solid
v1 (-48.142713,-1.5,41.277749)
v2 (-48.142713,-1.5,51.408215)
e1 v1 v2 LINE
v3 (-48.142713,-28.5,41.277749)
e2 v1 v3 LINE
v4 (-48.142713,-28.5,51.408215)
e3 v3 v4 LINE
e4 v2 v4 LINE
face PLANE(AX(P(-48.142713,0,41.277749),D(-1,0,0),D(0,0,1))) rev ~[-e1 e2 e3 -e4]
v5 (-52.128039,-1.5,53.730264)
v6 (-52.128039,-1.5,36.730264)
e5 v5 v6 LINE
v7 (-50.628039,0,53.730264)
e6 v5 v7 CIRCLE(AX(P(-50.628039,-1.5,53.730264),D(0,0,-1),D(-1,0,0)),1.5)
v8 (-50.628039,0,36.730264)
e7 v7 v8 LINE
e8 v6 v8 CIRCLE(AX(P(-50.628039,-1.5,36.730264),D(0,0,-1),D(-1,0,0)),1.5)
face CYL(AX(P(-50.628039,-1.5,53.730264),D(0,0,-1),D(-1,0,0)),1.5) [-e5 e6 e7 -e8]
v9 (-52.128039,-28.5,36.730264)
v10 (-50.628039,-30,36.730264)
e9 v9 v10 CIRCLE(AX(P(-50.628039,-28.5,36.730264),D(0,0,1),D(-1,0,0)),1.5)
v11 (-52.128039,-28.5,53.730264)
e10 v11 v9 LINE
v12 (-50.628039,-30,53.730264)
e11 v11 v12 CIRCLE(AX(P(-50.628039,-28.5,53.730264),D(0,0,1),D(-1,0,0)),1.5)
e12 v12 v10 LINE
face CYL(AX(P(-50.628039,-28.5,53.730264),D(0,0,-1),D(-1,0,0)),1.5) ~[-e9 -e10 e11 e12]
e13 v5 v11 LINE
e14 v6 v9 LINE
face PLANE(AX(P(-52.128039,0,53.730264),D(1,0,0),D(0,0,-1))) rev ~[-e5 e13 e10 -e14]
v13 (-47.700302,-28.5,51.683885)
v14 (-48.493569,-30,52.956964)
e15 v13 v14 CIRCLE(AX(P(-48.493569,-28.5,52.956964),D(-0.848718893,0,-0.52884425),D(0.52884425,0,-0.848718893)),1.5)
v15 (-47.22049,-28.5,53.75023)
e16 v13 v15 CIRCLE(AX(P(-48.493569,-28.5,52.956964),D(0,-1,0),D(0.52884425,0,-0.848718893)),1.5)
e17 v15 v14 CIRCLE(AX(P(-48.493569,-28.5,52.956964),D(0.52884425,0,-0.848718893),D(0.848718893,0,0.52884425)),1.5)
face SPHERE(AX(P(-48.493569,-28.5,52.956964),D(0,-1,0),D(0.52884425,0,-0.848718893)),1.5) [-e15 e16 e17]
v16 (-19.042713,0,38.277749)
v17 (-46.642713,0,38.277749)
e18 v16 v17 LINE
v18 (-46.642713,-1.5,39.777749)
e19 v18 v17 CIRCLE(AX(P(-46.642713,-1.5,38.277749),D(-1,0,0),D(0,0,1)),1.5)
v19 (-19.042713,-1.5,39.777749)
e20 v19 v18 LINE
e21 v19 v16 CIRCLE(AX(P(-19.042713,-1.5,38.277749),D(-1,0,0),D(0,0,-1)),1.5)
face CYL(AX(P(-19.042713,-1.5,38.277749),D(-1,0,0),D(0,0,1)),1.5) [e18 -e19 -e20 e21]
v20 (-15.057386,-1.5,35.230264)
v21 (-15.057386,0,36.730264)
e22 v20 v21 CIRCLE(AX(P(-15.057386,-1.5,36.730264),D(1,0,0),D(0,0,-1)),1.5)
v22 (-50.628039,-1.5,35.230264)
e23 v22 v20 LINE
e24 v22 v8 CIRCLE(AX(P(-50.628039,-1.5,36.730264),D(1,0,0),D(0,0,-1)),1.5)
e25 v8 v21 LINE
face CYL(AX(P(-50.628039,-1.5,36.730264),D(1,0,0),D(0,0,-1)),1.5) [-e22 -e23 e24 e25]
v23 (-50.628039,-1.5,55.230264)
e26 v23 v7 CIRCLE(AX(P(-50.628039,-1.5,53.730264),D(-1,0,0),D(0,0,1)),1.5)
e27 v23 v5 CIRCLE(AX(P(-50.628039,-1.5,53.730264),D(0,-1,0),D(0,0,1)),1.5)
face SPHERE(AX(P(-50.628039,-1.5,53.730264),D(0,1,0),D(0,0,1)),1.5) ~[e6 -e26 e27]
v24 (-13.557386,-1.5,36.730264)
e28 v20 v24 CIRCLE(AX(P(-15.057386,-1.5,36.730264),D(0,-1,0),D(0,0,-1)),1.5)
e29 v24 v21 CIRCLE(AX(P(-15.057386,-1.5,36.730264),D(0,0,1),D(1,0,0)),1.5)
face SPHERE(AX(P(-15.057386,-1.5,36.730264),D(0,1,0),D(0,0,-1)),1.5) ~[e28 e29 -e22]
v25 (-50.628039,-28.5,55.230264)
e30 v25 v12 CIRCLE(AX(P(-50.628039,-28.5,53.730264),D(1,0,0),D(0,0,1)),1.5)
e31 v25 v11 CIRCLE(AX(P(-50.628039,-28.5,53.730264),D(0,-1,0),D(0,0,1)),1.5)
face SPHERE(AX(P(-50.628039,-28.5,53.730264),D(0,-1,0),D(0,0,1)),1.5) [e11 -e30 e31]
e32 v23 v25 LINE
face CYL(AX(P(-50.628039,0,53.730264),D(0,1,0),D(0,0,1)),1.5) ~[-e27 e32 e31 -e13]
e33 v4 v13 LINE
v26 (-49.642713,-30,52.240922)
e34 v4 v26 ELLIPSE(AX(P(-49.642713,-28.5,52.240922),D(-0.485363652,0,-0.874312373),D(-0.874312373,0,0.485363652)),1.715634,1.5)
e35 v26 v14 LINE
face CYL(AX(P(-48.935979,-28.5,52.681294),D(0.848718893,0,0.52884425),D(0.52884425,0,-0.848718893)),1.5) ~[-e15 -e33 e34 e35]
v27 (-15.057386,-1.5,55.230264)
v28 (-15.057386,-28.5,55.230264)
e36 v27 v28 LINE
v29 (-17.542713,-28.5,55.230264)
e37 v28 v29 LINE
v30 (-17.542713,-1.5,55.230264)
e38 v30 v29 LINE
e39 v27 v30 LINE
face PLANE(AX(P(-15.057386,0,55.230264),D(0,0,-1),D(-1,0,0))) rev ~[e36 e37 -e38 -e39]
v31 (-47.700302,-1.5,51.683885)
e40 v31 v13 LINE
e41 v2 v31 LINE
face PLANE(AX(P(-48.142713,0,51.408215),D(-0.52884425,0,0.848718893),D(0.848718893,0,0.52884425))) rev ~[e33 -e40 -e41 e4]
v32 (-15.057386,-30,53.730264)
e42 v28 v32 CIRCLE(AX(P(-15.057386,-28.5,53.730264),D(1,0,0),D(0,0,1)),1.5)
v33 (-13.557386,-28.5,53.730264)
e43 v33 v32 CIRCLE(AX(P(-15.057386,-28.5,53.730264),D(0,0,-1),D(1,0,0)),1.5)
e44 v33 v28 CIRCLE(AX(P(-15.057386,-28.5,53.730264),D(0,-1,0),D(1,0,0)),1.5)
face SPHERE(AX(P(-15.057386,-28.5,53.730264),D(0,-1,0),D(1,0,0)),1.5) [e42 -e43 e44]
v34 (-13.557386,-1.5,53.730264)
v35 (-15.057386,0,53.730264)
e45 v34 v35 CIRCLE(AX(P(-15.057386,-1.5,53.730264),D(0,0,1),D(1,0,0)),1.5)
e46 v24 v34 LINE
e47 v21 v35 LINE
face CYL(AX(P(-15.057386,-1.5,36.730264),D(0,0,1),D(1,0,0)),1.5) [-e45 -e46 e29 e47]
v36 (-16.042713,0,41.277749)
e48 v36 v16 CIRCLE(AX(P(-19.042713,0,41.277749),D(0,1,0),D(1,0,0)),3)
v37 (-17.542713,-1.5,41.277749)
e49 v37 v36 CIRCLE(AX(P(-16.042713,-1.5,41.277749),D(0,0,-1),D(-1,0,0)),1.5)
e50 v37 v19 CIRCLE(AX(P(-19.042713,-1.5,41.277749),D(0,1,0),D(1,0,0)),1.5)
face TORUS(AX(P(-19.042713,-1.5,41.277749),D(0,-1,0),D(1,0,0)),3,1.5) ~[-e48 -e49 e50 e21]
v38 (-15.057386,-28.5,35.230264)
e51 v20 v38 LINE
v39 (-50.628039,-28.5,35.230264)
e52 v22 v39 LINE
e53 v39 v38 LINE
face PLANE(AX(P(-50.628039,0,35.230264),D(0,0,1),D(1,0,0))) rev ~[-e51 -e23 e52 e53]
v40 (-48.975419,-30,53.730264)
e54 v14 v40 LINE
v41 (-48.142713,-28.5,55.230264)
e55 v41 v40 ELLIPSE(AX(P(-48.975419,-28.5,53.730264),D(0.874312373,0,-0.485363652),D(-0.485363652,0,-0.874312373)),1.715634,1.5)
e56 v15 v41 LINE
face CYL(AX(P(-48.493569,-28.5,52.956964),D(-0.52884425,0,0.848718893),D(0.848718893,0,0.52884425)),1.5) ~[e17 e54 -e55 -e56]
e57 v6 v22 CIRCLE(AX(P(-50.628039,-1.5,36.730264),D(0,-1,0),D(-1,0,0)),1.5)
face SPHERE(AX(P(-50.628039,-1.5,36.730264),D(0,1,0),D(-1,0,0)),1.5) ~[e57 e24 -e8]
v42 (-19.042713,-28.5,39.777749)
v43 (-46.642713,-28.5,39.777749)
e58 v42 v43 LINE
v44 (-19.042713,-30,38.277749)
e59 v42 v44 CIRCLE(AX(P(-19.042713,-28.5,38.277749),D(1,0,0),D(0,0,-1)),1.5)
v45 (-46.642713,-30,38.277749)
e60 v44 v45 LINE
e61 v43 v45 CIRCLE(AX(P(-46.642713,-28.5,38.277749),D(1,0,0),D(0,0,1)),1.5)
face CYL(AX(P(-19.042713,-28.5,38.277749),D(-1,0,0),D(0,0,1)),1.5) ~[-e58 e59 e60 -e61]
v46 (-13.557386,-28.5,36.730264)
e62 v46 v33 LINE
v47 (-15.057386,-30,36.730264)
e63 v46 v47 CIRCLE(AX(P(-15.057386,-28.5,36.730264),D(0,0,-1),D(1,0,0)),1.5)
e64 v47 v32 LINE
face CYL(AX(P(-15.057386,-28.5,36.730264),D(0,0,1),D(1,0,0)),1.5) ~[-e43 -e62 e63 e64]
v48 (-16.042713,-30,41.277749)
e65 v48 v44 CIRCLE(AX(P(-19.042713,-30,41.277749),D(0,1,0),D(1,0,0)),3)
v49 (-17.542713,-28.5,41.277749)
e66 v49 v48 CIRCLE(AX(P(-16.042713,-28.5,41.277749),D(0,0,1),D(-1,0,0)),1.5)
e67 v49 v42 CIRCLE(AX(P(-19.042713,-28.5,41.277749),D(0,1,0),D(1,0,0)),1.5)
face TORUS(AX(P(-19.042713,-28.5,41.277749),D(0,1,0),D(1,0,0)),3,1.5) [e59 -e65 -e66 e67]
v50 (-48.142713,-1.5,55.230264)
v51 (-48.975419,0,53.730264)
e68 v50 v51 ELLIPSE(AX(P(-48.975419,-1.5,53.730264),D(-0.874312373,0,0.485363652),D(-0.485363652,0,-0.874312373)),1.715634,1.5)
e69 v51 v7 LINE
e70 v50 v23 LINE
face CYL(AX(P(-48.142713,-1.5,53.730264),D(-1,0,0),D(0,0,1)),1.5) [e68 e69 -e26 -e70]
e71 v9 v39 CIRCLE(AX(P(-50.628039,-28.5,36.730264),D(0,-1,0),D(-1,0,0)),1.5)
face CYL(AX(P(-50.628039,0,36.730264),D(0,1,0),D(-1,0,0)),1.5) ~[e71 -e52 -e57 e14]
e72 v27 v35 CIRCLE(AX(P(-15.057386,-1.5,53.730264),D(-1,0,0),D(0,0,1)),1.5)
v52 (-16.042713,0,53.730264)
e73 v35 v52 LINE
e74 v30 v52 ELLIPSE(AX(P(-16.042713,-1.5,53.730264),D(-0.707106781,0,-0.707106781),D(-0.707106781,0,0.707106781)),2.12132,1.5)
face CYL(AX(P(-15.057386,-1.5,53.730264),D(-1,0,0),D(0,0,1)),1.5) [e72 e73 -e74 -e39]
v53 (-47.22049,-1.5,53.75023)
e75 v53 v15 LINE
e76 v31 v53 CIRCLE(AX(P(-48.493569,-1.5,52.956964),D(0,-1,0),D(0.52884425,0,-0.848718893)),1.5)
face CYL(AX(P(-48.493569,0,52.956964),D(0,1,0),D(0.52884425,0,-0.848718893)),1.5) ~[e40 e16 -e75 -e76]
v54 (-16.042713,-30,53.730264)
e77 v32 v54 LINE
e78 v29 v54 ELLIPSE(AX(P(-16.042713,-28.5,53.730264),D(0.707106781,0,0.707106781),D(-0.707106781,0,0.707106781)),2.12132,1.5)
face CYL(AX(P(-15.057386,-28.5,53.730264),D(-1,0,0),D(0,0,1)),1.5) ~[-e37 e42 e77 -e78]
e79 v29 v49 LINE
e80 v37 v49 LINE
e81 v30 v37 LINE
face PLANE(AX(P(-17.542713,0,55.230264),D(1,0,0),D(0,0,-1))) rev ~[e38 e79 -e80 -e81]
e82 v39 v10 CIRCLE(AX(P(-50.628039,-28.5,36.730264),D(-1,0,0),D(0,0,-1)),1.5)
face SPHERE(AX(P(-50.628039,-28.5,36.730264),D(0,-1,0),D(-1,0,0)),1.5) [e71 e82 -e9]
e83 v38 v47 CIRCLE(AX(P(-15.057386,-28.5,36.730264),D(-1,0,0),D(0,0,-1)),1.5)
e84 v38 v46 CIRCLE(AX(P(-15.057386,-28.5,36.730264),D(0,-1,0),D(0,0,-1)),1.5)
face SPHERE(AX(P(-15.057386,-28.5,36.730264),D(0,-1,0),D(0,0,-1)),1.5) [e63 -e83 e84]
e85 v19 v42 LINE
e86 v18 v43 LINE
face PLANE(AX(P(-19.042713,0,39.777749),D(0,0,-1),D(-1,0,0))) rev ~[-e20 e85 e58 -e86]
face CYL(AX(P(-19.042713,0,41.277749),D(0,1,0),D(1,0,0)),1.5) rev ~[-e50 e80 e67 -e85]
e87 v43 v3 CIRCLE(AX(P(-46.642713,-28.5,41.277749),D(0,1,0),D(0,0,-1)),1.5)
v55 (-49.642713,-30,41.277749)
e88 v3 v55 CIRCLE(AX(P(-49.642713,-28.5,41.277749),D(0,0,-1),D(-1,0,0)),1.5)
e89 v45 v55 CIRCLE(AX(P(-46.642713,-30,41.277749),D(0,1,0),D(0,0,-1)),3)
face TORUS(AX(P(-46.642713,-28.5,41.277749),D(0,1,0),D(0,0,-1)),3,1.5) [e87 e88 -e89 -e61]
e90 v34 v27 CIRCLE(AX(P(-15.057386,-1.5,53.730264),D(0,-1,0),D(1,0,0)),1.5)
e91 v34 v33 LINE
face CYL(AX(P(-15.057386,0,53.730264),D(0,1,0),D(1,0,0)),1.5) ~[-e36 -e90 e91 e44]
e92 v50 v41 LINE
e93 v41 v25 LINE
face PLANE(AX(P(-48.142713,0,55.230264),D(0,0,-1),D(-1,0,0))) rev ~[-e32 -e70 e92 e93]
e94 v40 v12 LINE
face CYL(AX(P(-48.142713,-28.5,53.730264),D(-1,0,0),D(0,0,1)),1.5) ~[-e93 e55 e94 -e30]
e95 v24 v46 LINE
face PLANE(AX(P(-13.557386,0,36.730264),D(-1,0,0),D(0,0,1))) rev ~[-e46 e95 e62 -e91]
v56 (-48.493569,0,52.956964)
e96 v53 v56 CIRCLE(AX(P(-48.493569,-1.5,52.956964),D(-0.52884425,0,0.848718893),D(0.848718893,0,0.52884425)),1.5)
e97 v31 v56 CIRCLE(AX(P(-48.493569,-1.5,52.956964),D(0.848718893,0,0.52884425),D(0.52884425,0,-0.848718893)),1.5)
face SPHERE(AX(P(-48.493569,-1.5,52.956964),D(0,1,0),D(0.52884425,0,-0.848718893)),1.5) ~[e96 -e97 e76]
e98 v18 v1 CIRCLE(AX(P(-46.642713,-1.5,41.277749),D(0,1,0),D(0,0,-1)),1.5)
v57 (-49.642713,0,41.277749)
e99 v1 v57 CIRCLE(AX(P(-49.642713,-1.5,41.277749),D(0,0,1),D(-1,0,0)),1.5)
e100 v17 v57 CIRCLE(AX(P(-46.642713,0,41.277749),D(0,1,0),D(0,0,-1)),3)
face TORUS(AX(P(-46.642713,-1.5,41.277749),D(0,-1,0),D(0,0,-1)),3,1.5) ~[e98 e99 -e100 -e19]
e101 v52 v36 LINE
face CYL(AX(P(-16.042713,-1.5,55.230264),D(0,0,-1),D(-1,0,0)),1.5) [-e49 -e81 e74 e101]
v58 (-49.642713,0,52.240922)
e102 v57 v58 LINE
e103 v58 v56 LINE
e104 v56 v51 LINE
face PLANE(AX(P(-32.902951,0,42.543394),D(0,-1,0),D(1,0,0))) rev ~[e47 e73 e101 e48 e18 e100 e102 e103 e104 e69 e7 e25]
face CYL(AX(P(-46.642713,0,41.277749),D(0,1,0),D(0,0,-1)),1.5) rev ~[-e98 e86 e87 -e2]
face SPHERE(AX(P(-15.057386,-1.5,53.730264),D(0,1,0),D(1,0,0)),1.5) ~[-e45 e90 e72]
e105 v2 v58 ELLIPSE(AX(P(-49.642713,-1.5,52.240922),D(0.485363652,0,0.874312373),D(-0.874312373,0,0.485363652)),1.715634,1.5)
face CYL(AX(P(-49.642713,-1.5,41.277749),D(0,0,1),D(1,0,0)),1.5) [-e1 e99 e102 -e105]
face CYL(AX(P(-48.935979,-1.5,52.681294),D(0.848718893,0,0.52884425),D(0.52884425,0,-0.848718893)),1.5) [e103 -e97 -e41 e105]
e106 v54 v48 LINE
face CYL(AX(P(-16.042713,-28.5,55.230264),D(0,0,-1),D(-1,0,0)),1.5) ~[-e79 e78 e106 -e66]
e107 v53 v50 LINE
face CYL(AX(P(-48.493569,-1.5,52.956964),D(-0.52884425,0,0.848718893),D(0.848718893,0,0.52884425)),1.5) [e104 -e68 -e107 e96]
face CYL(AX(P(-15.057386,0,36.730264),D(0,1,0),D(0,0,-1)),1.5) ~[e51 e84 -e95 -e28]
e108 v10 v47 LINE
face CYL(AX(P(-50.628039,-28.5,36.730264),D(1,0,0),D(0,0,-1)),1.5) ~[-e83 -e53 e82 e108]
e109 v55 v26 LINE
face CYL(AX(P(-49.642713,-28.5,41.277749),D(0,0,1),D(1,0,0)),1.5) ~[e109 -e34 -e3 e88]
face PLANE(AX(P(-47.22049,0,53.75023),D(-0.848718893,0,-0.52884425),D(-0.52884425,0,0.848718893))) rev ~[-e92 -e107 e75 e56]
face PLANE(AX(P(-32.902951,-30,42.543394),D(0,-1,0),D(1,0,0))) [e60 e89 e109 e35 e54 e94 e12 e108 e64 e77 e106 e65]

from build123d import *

# Parameters (mm, degrees)
F1_DEPTH = 30
F2_R     = 1.5


# Not quite as in the source:
# - a feature names something its author has since deleted; it is built from what else it names


with BuildPart() as f1:
    # F0 (on Front) → F1 (new body)
    with BuildSketch(Plane.XZ):
        with BuildLine():
            ThreePointArc((-50.6280393004, 55.2302640676), (-51.6886994722, 54.7909242394), (-52.1280393004, 53.7302640676))
            Line((-52.1280393004, 53.7302640676), (-52.1280393004, 36.7302640676))
            ThreePointArc((-52.1280393004, 36.7302640676), (-51.6886994722, 35.6696038959), (-50.6280393004, 35.2302640676))
            Line((-50.6280393004, 35.2302640676), (-15.0573858261, 35.2302640676))
            ThreePointArc((-15.0573858261, 35.2302640676), (-13.9967256543, 35.6696038959), (-13.5573858261, 36.7302640676))
            Line((-13.5573858261, 36.7302640676), (-13.5573858261, 53.7302640676))
            ThreePointArc((-13.5573858261, 53.7302640676), (-13.9967256543, 54.7909242394), (-15.0573858261, 55.2302640676))
            Line((-15.0573858261, 55.2302640676), (-17.5427125633, 55.2302640676))
            Line((-17.5427125633, 55.2302640676), (-17.5427125633, 41.2777487338))
            ThreePointArc((-17.5427125633, 41.2777487338), (-17.9820523915, 40.217088562), (-19.0427125633, 39.7777487338))
            Line((-19.0427125633, 39.7777487338), (-46.6427125633, 39.7777487338))
            ThreePointArc((-46.6427125633, 39.7777487338), (-47.7033727351, 40.217088562), (-48.1427125633, 41.2777487338))
            Line((-48.1427125633, 41.2777487338), (-48.1427125633, 51.408215398))
            Line((-48.1427125633, 51.408215398), (-47.7003021707, 51.6838852273))
            ThreePointArc((-47.7003021707, 51.6838852273), (-47.032442186, 52.6176852731), (-47.2204902066, 53.7502299418))
            Line((-47.2204902066, 53.7502299418), (-48.1427125633, 55.2302640676))
            Line((-48.1427125633, 55.2302640676), (-50.6280393004, 55.2302640676))
        make_face()
    extrude(amount=F1_DEPTH)

    # F2
    f2_edges = [f1.edges().sort_by_distance(p)[0] for p in [
        (-49.385376, -30, 55.230264),
        (-51.688699, -30, 54.790924),
        (-52.128039, -30, 45.230264),
        (-51.688699, -30, 35.669604),
        (-32.842713, -30, 35.230264),
        (-13.996726, -30, 35.669604),
        (-13.557386, -30, 45.230264),
        (-13.996726, -30, 54.790924),
        (-16.300049, -30, 55.230264),
        (-17.542713, -30, 48.254006),
        (-17.982052, -30, 40.217089),
        (-32.842713, -30, 39.777749),
        (-47.703373, -30, 40.217089),
        (-48.142713, -30, 46.342982),
        (-47.921507, -30, 51.54605),
        (-47.032442, -30, 52.617685),
        (-47.681601, -30, 54.490247),
        (-49.385376, 0, 55.230264),
        (-51.688699, 0, 54.790924),
        (-52.128039, 0, 45.230264),
        (-51.688699, 0, 35.669604),
        (-32.842713, 0, 35.230264),
        (-13.996726, 0, 35.669604),
        (-13.557386, 0, 45.230264),
        (-13.996726, 0, 54.790924),
        (-16.300049, 0, 55.230264),
        (-17.542713, 0, 48.254006),
        (-17.982052, 0, 40.217089),
        (-32.842713, 0, 39.777749),
        (-47.703373, 0, 40.217089),
        (-48.142713, 0, 46.342982),
        (-47.921507, 0, 51.54605),
        (-47.032442, 0, 52.617685),
        (-47.681601, 0, 54.490247),
    ]]
    fillet(f2_edges, radius=F2_R)


solid = f1.part
